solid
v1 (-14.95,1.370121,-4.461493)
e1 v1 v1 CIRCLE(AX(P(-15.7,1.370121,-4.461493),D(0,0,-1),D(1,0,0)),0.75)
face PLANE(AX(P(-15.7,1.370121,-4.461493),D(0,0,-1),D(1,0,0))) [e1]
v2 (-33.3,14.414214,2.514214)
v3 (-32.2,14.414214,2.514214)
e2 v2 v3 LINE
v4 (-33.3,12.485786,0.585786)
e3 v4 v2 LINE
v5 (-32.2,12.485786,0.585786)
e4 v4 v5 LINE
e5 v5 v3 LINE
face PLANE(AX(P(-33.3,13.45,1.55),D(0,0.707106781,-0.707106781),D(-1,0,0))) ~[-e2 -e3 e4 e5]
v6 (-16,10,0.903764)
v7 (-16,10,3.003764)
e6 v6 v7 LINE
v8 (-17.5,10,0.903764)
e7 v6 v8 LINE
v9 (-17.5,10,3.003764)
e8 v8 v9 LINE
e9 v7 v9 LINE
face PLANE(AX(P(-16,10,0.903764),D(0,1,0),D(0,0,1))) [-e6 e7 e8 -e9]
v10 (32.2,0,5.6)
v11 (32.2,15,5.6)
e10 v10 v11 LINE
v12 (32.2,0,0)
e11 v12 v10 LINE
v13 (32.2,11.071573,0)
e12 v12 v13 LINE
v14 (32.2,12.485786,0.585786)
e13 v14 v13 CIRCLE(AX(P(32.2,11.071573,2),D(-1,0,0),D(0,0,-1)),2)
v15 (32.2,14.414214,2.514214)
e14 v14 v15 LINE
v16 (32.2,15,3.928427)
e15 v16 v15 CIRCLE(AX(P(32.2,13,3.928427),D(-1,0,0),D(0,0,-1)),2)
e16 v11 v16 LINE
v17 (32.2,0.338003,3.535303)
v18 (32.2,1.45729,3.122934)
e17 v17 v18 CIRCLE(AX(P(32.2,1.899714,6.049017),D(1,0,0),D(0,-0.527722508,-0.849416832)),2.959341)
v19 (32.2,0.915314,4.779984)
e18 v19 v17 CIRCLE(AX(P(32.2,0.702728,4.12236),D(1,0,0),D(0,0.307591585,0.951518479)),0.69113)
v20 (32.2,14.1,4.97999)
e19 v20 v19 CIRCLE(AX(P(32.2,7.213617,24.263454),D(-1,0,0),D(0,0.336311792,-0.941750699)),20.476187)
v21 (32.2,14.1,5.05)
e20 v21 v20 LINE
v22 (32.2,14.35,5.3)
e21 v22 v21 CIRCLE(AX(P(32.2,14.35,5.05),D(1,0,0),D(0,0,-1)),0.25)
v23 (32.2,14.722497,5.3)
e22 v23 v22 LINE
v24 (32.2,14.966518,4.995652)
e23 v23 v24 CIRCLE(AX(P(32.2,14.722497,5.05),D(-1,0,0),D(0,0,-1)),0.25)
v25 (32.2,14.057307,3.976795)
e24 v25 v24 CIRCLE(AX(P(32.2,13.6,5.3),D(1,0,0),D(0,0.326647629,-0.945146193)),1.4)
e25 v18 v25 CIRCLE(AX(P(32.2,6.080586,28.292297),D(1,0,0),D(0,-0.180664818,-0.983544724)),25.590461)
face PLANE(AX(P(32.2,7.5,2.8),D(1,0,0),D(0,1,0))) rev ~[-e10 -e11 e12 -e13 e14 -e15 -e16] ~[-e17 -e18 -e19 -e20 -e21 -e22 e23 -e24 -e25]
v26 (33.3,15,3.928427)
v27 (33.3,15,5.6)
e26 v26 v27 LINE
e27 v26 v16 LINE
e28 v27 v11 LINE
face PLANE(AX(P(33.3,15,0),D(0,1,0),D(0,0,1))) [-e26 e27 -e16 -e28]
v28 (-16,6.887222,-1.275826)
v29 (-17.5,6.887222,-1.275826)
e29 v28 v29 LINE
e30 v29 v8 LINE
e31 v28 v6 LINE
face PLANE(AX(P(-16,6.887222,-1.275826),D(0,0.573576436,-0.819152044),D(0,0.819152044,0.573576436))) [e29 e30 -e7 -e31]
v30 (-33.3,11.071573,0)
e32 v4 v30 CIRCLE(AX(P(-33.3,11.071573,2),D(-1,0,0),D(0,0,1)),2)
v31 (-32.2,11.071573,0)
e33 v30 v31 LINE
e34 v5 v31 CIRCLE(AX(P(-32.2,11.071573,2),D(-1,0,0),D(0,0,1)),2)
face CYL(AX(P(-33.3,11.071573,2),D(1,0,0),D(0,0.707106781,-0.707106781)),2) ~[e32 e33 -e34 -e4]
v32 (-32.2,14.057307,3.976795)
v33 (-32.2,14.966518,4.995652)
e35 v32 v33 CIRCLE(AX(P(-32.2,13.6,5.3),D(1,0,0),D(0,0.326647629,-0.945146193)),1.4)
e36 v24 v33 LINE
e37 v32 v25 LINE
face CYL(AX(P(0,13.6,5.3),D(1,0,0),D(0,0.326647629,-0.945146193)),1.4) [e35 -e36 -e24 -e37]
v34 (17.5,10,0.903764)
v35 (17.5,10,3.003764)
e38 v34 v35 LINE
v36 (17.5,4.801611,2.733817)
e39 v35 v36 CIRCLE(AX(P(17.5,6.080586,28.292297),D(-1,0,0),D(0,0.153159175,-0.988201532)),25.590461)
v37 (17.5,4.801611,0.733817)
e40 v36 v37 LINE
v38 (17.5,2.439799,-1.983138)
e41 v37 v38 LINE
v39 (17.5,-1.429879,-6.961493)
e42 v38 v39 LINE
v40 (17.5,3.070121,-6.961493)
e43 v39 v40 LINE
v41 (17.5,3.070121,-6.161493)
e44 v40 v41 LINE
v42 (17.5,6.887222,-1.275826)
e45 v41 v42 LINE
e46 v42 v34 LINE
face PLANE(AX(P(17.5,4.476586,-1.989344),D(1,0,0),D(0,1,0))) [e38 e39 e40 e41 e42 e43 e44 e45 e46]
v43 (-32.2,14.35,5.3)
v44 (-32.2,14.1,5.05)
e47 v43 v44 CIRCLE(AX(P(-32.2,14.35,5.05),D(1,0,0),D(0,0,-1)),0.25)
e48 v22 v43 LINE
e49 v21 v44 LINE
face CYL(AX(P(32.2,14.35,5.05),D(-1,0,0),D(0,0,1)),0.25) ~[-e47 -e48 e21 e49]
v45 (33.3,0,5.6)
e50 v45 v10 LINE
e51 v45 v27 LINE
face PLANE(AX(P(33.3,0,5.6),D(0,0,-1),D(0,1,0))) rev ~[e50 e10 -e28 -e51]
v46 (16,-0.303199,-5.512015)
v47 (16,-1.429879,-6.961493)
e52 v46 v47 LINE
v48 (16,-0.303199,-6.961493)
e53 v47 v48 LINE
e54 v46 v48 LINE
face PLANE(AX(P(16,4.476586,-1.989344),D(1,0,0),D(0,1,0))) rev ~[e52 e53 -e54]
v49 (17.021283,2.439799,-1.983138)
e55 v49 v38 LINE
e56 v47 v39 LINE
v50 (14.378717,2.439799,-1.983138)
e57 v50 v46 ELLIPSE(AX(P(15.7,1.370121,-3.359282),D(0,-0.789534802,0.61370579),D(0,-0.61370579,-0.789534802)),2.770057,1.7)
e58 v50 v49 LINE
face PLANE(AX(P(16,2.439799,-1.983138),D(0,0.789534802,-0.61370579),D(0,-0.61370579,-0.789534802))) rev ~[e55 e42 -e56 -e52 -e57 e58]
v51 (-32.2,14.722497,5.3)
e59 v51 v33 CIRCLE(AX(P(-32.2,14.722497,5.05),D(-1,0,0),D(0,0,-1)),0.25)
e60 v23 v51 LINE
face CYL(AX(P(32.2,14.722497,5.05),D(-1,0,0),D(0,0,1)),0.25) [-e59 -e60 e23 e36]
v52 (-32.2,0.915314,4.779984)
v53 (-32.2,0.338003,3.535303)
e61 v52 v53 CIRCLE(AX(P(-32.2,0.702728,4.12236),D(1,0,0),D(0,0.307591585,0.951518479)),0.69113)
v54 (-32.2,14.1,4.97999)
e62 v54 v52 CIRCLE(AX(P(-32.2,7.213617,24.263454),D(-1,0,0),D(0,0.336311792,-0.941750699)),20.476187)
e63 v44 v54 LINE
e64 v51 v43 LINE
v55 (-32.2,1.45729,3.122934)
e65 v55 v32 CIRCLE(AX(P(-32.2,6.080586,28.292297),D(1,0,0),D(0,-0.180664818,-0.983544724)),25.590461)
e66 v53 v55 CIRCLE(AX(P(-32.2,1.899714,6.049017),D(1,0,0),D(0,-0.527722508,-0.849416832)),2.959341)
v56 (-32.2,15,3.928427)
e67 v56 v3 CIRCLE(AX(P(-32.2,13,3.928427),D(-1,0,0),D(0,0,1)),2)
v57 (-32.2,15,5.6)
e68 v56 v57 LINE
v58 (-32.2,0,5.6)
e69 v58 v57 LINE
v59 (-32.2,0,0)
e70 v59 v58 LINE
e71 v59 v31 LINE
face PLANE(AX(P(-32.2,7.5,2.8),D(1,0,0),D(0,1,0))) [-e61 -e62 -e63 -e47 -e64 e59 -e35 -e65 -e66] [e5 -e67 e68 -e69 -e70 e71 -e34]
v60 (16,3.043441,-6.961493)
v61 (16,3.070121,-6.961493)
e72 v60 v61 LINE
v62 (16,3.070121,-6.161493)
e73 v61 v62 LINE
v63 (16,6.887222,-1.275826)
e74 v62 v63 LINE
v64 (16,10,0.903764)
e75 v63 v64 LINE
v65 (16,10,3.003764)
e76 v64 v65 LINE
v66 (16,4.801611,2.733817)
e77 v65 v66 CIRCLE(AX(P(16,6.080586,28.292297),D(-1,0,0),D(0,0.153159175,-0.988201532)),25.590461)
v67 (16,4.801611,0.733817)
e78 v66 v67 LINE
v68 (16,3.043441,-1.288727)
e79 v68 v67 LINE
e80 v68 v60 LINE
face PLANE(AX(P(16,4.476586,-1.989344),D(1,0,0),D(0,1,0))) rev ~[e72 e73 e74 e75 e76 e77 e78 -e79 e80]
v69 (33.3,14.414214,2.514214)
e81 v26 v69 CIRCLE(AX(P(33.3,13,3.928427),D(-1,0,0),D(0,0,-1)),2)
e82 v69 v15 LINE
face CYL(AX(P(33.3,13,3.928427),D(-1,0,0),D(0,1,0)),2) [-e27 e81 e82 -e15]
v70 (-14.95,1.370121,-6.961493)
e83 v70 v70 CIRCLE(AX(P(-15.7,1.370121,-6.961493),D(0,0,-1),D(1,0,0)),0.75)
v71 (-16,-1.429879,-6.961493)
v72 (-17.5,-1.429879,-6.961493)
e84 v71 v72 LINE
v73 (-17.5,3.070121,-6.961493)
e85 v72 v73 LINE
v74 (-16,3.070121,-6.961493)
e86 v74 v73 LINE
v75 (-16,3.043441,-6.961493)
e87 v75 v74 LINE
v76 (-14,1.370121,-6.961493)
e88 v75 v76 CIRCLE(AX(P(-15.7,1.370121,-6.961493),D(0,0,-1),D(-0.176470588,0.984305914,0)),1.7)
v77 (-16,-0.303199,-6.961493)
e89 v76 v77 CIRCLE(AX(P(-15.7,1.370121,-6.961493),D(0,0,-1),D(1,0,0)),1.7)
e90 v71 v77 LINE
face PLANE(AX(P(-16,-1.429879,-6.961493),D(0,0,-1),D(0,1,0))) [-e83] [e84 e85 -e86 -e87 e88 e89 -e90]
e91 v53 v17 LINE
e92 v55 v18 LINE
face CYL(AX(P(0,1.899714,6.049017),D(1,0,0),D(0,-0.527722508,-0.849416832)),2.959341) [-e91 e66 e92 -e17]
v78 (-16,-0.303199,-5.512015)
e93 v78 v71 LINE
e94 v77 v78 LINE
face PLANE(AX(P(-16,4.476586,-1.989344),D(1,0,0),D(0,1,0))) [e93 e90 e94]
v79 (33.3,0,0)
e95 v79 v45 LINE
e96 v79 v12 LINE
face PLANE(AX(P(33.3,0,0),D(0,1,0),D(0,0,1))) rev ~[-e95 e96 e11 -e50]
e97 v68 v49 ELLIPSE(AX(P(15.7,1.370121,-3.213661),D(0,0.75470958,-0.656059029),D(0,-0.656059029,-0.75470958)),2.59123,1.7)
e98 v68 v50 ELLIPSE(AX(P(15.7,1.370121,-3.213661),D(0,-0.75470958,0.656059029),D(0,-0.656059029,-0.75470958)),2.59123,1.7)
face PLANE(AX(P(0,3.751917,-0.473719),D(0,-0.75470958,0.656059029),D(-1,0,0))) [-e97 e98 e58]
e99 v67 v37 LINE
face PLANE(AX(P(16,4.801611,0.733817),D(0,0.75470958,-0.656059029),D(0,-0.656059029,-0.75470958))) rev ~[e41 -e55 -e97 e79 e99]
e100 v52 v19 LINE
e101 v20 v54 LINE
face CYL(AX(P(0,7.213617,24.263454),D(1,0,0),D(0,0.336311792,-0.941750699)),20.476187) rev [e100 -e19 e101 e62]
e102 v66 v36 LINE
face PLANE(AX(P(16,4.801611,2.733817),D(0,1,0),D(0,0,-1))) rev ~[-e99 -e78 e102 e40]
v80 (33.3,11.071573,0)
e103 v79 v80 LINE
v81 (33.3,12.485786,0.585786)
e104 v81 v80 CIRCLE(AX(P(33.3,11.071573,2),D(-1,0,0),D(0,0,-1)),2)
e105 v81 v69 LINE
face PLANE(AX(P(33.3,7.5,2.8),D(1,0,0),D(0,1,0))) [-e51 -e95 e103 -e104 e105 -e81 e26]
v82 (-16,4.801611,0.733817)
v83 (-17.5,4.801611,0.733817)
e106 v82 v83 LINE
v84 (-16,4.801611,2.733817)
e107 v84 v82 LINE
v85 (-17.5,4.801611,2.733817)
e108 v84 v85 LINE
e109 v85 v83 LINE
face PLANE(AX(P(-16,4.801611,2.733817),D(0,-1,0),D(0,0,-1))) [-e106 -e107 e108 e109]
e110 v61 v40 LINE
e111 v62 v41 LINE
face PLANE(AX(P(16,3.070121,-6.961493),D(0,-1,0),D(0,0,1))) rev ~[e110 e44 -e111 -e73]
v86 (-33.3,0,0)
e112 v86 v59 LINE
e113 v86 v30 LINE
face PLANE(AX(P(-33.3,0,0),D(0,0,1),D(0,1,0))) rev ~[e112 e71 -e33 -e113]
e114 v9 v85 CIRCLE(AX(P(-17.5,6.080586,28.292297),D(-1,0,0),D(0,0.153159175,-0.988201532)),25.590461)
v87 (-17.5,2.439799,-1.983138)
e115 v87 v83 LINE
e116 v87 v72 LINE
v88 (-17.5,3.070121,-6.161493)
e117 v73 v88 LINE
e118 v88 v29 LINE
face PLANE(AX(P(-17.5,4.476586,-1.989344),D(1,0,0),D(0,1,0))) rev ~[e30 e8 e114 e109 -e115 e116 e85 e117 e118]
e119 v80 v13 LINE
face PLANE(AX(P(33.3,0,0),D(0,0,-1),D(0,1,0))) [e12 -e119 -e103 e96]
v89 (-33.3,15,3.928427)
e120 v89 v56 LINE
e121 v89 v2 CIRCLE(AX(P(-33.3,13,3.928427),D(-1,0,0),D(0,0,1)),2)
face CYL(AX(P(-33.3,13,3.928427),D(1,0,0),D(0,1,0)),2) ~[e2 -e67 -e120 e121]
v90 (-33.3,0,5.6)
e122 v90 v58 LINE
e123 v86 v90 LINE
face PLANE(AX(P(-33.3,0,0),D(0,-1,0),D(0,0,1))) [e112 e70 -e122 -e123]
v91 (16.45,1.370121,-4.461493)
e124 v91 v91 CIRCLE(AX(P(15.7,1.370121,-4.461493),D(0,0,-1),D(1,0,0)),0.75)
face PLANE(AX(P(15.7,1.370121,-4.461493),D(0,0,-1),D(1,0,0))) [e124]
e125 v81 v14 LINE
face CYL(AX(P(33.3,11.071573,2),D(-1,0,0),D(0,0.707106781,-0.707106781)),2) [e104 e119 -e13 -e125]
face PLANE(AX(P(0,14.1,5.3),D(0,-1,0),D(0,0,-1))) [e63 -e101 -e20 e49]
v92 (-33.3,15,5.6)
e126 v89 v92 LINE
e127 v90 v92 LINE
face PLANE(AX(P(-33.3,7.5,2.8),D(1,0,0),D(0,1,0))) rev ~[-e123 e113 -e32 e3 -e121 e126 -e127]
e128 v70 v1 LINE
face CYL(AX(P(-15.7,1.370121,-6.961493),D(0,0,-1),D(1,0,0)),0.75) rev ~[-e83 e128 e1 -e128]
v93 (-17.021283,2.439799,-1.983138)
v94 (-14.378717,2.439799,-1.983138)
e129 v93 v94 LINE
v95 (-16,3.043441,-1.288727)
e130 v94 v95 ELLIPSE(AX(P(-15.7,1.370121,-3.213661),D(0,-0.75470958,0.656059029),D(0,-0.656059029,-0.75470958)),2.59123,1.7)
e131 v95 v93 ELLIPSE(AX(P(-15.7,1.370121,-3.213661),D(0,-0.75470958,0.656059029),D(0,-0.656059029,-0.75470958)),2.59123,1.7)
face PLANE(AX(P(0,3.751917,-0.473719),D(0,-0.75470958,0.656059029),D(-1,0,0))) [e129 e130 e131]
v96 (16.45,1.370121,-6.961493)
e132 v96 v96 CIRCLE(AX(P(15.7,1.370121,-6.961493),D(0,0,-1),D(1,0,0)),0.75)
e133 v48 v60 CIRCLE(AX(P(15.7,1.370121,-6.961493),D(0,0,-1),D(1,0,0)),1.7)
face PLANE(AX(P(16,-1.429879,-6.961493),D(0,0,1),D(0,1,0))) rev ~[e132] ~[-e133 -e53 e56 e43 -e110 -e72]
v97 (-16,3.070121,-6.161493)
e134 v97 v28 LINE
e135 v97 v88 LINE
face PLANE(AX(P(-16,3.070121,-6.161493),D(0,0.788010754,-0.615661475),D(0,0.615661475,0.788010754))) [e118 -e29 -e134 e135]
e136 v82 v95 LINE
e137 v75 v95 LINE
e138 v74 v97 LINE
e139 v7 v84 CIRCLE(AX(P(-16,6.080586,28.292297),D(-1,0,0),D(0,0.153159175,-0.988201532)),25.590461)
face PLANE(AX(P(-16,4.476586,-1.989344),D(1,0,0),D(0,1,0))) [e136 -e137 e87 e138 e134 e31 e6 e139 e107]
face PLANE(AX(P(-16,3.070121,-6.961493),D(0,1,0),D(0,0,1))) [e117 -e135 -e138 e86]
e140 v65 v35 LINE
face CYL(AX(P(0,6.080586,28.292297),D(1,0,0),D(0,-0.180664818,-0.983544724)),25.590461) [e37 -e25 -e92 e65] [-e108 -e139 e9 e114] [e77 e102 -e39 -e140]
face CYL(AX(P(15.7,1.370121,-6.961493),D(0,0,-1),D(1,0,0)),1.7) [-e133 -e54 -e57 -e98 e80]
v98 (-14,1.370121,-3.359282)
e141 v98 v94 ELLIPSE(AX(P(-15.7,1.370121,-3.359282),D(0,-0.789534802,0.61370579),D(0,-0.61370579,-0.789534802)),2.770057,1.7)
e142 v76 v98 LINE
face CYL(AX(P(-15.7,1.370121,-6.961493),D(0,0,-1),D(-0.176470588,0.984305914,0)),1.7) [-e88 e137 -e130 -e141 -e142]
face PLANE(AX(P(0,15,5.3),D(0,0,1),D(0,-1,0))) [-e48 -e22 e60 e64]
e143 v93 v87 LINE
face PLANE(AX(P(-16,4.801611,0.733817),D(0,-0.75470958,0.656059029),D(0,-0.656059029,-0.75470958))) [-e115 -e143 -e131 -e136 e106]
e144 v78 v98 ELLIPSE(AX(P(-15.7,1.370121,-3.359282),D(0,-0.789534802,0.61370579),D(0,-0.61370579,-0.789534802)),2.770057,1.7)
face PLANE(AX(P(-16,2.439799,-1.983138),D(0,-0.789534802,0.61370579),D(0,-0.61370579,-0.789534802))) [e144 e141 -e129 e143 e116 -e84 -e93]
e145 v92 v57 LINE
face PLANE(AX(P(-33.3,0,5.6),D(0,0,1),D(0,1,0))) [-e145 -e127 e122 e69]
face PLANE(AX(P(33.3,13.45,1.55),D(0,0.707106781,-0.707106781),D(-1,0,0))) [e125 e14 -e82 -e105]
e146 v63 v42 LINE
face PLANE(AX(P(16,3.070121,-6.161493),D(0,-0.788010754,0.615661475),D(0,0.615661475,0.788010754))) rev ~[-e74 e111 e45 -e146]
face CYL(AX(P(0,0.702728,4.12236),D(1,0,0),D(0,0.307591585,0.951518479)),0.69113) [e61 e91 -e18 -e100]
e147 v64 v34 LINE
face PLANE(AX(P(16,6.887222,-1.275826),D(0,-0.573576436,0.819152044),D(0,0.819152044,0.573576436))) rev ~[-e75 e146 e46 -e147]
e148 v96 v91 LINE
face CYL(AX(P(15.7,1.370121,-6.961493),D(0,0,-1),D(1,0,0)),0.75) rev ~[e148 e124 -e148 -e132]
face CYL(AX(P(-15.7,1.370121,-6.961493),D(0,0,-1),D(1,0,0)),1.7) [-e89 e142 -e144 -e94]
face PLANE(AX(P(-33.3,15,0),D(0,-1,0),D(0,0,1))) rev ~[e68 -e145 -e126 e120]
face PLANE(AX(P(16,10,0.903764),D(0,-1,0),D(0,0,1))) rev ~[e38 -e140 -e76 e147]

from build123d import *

# Parameters (mm, degrees)
F4_W      = 15
F4_H      = 5.6
F5_DEPTH  = 1.1
F6_SIZE   = 3.1
F7_W      = 15
F7_H      = 5.6
F8_DEPTH  = 1.1
F9_SIZE   = 3.1
F11_DEPTH = 32.2
F12_R     = 0.25
F13_R     = 2
F15_DEPTH = 1.5
F17_DEPTH = 1.5
F18_R     = 1.7
F19_DEPTH = 6.8
F22_W     = 36
F22_H     = 4
F24_R     = 0.75
F25_DEPTH = 2.5


with BuildPart() as f5:
    # F4 (on offset) → F5 (new body)
    with BuildSketch(Plane.YZ.offset(33.3)):
        with Locations((7.5, 2.8)):
            Rectangle(F4_W, F4_H)
    extrude(amount=-F5_DEPTH)

    # F6
    f6_edges = [f5.edges().sort_by_distance(p)[0] for p in [
        (32.75, 15, 0),
    ]]
    chamfer(f6_edges, length=F6_SIZE)



with BuildPart() as f8:
    # F7 (on offset) → F8 (new body)
    with BuildSketch(Plane.YZ.offset(-33.3)):
        with Locations((7.5, 2.8)):
            Rectangle(F7_W, F7_H)
    extrude(amount=F8_DEPTH)

    # F9
    f9_edges = [f8.edges().sort_by_distance(p)[0] for p in [
        (-32.75, 15, 0),
    ]]
    chamfer(f9_edges, length=F9_SIZE)


with BuildPart() as f5_1:
    add(f5.part)

    add(f8.part)  # F11 merges F8
    # F10 (on Right) → F11 (join, symmetric)
    with BuildSketch(Plane.YZ):
        with BuildLine():
            ThreePointArc((14.1, 4.9799904701), (7.5241974898, 3.7896224533), (0.9153141097, 4.7799835677))
            ThreePointArc((0.9153141097, 4.7799835677), (0.075756099, 4.4131641565), (0.3380033304, 3.5353028215))
            ThreePointArc((0.3380033304, 3.5353028215), (0.8766544844, 3.272139492), (1.4572901418, 3.1229341403))
            ThreePointArc((1.4572901418, 3.1229341403), (7.8107981998, 2.7603942388), (14.0573066811, 3.9767953297))
            ThreePointArc((14.0573066811, 3.9767953297), (14.7402257131, 4.4876667413), (15, 5.3))
            Line((15, 5.3), (14.1, 5.3))
            Line((14.1, 5.3), (14.1, 4.9799904701))
        make_face()
    extrude(amount=F11_DEPTH, both=True)

    # F12
    f12_edges = [f5_1.edges().sort_by_distance(p)[0] for p in [
        (0, 14.1, 5.3),
        (0, 15, 5.3),
    ]]
    fillet(f12_edges, radius=F12_R)

    # F13
    f13_edges = [f5_1.edges().sort_by_distance(p)[0] for p in [
        (32.75, 11.9, 0),
        (32.75, 15, 3.1),
        (-32.75, 15, 3.1),
        (-32.75, 11.9, 0),
    ]]
    fillet(f13_edges, radius=F13_R)

    # F14 (on offset) → F15 (join)
    with BuildSketch(Plane.YZ.offset(-16)):
        with BuildLine():
            ThreePointArc((10, 3.0037642772), (7.4076873546, 2.736270416), (4.8016114163, 2.7338166819))
            Line((4.8016114163, 2.7338166819), (4.8016114163, 0.7338166819))
            Line((4.8016114163, 0.7338166819), (2.4397989119, -1.9831378069))
            Line((2.4397989119, -1.9831378069), (-1.4298789153, -6.9614928532))
            Line((-1.4298789153, -6.9614928532), (3.0701210847, -6.9614928532))
            Line((3.0701210847, -6.9614928532), (3.0701210847, -6.1614928532))
            Line((3.0701210847, -6.1614928532), (6.8872222317, -1.2758261809))
            Line((6.8872222317, -1.2758261809), (10, 0.9037642772))
            Line((10, 0.9037642772), (10, 3.0037642772))
        make_face()
    extrude(amount=-F15_DEPTH)

    # F16 (on offset) → F17 (join)
    with BuildSketch(Plane.YZ.offset(16)):
        with BuildLine():
            Line((2.4397989119, -1.9831378069), (-1.4298789153, -6.9614928532))
            Line((-1.4298789153, -6.9614928532), (3.0701210847, -6.9614928532))
            Line((3.0701210847, -6.9614928532), (3.0701210847, -6.1614928532))
            Line((3.0701210847, -6.1614928532), (6.8872222317, -1.2758261809))
            Line((6.8872222317, -1.2758261809), (10, 0.9037642772))
            Line((10, 0.9037642772), (10, 3.0037642772))
            ThreePointArc((10, 3.0037642772), (7.4076873546, 2.736270416), (4.8016114163, 2.7338166819))
            Line((4.8016114163, 2.7338166819), (4.8016114163, 0.7338166819))
            Line((4.8016114163, 0.7338166819), (2.4397989119, -1.9831378069))
        make_face()
    extrude(amount=F17_DEPTH)

    # F18 (on face) → F19 (join)
    with BuildSketch(Plane(origin=(0, 0, -6.9614928532), x_dir=(1, 0, 0), z_dir=(0, 0, -1))):
        with BuildLine():
            Line((-16, -3.0434411378), (-16, 0.3031989684))
            ThreePointArc((-16, 0.3031989684), (-17.4, -1.3701210847), (-16, -3.0434411378))
        make_face()
        with BuildLine():
            ThreePointArc((-16, -3.0434411378), (-14.6091287885, -2.6739615657), (-14, -1.3701210847))
            ThreePointArc((-14, -1.3701210847), (-14.6091287885, -0.0662806036), (-16, 0.3031989684))
            Line((-16, 0.3031989684), (-16, -3.0434411378))
        make_face()
        with Locations((15.7, -1.3701210847)):
            Circle(F18_R)
    extrude(amount=-F19_DEPTH)

    # F23: sweep along a path in F20
    with BuildLine(Plane(origin=(-17.5, 0, 0), x_dir=(0, -1, 0), z_dir=(-1, 0, 0))) as f23_path:
        Line((-3.7519169699, -0.4737186464), (-2.4397989119, -1.9831378069))
        Line((-2.4397989119, -1.9831378069), (1.4298789153, -6.9614928532))
    # F22 (on face) → F23 (sweep, cut)
    with BuildSketch(Plane(origin=(0, -3.9117899018, -5.0321591222), x_dir=(1, 0, 0), z_dir=(0, 0.6137341658, 0.7895127445))):
        with Locations((0, 1.1435983825)):
            Rectangle(F22_W, F22_H)
    sweep(path=f23_path.line, transition=Transition.RIGHT, mode=Mode.SUBTRACT)

    # F24 (on face) → F25 (cut)
    with BuildSketch(Plane(origin=(0, 0, -6.9614928532), x_dir=(1, 0, 0), z_dir=(0, 0, -1))):
        with Locations((-15.7, -1.3701210847)):
            Circle(F24_R)
        with Locations((15.7, -1.3701210847)):
            Circle(F24_R)
    extrude(amount=-F25_DEPTH, mode=Mode.SUBTRACT)


solid = f5_1.part
